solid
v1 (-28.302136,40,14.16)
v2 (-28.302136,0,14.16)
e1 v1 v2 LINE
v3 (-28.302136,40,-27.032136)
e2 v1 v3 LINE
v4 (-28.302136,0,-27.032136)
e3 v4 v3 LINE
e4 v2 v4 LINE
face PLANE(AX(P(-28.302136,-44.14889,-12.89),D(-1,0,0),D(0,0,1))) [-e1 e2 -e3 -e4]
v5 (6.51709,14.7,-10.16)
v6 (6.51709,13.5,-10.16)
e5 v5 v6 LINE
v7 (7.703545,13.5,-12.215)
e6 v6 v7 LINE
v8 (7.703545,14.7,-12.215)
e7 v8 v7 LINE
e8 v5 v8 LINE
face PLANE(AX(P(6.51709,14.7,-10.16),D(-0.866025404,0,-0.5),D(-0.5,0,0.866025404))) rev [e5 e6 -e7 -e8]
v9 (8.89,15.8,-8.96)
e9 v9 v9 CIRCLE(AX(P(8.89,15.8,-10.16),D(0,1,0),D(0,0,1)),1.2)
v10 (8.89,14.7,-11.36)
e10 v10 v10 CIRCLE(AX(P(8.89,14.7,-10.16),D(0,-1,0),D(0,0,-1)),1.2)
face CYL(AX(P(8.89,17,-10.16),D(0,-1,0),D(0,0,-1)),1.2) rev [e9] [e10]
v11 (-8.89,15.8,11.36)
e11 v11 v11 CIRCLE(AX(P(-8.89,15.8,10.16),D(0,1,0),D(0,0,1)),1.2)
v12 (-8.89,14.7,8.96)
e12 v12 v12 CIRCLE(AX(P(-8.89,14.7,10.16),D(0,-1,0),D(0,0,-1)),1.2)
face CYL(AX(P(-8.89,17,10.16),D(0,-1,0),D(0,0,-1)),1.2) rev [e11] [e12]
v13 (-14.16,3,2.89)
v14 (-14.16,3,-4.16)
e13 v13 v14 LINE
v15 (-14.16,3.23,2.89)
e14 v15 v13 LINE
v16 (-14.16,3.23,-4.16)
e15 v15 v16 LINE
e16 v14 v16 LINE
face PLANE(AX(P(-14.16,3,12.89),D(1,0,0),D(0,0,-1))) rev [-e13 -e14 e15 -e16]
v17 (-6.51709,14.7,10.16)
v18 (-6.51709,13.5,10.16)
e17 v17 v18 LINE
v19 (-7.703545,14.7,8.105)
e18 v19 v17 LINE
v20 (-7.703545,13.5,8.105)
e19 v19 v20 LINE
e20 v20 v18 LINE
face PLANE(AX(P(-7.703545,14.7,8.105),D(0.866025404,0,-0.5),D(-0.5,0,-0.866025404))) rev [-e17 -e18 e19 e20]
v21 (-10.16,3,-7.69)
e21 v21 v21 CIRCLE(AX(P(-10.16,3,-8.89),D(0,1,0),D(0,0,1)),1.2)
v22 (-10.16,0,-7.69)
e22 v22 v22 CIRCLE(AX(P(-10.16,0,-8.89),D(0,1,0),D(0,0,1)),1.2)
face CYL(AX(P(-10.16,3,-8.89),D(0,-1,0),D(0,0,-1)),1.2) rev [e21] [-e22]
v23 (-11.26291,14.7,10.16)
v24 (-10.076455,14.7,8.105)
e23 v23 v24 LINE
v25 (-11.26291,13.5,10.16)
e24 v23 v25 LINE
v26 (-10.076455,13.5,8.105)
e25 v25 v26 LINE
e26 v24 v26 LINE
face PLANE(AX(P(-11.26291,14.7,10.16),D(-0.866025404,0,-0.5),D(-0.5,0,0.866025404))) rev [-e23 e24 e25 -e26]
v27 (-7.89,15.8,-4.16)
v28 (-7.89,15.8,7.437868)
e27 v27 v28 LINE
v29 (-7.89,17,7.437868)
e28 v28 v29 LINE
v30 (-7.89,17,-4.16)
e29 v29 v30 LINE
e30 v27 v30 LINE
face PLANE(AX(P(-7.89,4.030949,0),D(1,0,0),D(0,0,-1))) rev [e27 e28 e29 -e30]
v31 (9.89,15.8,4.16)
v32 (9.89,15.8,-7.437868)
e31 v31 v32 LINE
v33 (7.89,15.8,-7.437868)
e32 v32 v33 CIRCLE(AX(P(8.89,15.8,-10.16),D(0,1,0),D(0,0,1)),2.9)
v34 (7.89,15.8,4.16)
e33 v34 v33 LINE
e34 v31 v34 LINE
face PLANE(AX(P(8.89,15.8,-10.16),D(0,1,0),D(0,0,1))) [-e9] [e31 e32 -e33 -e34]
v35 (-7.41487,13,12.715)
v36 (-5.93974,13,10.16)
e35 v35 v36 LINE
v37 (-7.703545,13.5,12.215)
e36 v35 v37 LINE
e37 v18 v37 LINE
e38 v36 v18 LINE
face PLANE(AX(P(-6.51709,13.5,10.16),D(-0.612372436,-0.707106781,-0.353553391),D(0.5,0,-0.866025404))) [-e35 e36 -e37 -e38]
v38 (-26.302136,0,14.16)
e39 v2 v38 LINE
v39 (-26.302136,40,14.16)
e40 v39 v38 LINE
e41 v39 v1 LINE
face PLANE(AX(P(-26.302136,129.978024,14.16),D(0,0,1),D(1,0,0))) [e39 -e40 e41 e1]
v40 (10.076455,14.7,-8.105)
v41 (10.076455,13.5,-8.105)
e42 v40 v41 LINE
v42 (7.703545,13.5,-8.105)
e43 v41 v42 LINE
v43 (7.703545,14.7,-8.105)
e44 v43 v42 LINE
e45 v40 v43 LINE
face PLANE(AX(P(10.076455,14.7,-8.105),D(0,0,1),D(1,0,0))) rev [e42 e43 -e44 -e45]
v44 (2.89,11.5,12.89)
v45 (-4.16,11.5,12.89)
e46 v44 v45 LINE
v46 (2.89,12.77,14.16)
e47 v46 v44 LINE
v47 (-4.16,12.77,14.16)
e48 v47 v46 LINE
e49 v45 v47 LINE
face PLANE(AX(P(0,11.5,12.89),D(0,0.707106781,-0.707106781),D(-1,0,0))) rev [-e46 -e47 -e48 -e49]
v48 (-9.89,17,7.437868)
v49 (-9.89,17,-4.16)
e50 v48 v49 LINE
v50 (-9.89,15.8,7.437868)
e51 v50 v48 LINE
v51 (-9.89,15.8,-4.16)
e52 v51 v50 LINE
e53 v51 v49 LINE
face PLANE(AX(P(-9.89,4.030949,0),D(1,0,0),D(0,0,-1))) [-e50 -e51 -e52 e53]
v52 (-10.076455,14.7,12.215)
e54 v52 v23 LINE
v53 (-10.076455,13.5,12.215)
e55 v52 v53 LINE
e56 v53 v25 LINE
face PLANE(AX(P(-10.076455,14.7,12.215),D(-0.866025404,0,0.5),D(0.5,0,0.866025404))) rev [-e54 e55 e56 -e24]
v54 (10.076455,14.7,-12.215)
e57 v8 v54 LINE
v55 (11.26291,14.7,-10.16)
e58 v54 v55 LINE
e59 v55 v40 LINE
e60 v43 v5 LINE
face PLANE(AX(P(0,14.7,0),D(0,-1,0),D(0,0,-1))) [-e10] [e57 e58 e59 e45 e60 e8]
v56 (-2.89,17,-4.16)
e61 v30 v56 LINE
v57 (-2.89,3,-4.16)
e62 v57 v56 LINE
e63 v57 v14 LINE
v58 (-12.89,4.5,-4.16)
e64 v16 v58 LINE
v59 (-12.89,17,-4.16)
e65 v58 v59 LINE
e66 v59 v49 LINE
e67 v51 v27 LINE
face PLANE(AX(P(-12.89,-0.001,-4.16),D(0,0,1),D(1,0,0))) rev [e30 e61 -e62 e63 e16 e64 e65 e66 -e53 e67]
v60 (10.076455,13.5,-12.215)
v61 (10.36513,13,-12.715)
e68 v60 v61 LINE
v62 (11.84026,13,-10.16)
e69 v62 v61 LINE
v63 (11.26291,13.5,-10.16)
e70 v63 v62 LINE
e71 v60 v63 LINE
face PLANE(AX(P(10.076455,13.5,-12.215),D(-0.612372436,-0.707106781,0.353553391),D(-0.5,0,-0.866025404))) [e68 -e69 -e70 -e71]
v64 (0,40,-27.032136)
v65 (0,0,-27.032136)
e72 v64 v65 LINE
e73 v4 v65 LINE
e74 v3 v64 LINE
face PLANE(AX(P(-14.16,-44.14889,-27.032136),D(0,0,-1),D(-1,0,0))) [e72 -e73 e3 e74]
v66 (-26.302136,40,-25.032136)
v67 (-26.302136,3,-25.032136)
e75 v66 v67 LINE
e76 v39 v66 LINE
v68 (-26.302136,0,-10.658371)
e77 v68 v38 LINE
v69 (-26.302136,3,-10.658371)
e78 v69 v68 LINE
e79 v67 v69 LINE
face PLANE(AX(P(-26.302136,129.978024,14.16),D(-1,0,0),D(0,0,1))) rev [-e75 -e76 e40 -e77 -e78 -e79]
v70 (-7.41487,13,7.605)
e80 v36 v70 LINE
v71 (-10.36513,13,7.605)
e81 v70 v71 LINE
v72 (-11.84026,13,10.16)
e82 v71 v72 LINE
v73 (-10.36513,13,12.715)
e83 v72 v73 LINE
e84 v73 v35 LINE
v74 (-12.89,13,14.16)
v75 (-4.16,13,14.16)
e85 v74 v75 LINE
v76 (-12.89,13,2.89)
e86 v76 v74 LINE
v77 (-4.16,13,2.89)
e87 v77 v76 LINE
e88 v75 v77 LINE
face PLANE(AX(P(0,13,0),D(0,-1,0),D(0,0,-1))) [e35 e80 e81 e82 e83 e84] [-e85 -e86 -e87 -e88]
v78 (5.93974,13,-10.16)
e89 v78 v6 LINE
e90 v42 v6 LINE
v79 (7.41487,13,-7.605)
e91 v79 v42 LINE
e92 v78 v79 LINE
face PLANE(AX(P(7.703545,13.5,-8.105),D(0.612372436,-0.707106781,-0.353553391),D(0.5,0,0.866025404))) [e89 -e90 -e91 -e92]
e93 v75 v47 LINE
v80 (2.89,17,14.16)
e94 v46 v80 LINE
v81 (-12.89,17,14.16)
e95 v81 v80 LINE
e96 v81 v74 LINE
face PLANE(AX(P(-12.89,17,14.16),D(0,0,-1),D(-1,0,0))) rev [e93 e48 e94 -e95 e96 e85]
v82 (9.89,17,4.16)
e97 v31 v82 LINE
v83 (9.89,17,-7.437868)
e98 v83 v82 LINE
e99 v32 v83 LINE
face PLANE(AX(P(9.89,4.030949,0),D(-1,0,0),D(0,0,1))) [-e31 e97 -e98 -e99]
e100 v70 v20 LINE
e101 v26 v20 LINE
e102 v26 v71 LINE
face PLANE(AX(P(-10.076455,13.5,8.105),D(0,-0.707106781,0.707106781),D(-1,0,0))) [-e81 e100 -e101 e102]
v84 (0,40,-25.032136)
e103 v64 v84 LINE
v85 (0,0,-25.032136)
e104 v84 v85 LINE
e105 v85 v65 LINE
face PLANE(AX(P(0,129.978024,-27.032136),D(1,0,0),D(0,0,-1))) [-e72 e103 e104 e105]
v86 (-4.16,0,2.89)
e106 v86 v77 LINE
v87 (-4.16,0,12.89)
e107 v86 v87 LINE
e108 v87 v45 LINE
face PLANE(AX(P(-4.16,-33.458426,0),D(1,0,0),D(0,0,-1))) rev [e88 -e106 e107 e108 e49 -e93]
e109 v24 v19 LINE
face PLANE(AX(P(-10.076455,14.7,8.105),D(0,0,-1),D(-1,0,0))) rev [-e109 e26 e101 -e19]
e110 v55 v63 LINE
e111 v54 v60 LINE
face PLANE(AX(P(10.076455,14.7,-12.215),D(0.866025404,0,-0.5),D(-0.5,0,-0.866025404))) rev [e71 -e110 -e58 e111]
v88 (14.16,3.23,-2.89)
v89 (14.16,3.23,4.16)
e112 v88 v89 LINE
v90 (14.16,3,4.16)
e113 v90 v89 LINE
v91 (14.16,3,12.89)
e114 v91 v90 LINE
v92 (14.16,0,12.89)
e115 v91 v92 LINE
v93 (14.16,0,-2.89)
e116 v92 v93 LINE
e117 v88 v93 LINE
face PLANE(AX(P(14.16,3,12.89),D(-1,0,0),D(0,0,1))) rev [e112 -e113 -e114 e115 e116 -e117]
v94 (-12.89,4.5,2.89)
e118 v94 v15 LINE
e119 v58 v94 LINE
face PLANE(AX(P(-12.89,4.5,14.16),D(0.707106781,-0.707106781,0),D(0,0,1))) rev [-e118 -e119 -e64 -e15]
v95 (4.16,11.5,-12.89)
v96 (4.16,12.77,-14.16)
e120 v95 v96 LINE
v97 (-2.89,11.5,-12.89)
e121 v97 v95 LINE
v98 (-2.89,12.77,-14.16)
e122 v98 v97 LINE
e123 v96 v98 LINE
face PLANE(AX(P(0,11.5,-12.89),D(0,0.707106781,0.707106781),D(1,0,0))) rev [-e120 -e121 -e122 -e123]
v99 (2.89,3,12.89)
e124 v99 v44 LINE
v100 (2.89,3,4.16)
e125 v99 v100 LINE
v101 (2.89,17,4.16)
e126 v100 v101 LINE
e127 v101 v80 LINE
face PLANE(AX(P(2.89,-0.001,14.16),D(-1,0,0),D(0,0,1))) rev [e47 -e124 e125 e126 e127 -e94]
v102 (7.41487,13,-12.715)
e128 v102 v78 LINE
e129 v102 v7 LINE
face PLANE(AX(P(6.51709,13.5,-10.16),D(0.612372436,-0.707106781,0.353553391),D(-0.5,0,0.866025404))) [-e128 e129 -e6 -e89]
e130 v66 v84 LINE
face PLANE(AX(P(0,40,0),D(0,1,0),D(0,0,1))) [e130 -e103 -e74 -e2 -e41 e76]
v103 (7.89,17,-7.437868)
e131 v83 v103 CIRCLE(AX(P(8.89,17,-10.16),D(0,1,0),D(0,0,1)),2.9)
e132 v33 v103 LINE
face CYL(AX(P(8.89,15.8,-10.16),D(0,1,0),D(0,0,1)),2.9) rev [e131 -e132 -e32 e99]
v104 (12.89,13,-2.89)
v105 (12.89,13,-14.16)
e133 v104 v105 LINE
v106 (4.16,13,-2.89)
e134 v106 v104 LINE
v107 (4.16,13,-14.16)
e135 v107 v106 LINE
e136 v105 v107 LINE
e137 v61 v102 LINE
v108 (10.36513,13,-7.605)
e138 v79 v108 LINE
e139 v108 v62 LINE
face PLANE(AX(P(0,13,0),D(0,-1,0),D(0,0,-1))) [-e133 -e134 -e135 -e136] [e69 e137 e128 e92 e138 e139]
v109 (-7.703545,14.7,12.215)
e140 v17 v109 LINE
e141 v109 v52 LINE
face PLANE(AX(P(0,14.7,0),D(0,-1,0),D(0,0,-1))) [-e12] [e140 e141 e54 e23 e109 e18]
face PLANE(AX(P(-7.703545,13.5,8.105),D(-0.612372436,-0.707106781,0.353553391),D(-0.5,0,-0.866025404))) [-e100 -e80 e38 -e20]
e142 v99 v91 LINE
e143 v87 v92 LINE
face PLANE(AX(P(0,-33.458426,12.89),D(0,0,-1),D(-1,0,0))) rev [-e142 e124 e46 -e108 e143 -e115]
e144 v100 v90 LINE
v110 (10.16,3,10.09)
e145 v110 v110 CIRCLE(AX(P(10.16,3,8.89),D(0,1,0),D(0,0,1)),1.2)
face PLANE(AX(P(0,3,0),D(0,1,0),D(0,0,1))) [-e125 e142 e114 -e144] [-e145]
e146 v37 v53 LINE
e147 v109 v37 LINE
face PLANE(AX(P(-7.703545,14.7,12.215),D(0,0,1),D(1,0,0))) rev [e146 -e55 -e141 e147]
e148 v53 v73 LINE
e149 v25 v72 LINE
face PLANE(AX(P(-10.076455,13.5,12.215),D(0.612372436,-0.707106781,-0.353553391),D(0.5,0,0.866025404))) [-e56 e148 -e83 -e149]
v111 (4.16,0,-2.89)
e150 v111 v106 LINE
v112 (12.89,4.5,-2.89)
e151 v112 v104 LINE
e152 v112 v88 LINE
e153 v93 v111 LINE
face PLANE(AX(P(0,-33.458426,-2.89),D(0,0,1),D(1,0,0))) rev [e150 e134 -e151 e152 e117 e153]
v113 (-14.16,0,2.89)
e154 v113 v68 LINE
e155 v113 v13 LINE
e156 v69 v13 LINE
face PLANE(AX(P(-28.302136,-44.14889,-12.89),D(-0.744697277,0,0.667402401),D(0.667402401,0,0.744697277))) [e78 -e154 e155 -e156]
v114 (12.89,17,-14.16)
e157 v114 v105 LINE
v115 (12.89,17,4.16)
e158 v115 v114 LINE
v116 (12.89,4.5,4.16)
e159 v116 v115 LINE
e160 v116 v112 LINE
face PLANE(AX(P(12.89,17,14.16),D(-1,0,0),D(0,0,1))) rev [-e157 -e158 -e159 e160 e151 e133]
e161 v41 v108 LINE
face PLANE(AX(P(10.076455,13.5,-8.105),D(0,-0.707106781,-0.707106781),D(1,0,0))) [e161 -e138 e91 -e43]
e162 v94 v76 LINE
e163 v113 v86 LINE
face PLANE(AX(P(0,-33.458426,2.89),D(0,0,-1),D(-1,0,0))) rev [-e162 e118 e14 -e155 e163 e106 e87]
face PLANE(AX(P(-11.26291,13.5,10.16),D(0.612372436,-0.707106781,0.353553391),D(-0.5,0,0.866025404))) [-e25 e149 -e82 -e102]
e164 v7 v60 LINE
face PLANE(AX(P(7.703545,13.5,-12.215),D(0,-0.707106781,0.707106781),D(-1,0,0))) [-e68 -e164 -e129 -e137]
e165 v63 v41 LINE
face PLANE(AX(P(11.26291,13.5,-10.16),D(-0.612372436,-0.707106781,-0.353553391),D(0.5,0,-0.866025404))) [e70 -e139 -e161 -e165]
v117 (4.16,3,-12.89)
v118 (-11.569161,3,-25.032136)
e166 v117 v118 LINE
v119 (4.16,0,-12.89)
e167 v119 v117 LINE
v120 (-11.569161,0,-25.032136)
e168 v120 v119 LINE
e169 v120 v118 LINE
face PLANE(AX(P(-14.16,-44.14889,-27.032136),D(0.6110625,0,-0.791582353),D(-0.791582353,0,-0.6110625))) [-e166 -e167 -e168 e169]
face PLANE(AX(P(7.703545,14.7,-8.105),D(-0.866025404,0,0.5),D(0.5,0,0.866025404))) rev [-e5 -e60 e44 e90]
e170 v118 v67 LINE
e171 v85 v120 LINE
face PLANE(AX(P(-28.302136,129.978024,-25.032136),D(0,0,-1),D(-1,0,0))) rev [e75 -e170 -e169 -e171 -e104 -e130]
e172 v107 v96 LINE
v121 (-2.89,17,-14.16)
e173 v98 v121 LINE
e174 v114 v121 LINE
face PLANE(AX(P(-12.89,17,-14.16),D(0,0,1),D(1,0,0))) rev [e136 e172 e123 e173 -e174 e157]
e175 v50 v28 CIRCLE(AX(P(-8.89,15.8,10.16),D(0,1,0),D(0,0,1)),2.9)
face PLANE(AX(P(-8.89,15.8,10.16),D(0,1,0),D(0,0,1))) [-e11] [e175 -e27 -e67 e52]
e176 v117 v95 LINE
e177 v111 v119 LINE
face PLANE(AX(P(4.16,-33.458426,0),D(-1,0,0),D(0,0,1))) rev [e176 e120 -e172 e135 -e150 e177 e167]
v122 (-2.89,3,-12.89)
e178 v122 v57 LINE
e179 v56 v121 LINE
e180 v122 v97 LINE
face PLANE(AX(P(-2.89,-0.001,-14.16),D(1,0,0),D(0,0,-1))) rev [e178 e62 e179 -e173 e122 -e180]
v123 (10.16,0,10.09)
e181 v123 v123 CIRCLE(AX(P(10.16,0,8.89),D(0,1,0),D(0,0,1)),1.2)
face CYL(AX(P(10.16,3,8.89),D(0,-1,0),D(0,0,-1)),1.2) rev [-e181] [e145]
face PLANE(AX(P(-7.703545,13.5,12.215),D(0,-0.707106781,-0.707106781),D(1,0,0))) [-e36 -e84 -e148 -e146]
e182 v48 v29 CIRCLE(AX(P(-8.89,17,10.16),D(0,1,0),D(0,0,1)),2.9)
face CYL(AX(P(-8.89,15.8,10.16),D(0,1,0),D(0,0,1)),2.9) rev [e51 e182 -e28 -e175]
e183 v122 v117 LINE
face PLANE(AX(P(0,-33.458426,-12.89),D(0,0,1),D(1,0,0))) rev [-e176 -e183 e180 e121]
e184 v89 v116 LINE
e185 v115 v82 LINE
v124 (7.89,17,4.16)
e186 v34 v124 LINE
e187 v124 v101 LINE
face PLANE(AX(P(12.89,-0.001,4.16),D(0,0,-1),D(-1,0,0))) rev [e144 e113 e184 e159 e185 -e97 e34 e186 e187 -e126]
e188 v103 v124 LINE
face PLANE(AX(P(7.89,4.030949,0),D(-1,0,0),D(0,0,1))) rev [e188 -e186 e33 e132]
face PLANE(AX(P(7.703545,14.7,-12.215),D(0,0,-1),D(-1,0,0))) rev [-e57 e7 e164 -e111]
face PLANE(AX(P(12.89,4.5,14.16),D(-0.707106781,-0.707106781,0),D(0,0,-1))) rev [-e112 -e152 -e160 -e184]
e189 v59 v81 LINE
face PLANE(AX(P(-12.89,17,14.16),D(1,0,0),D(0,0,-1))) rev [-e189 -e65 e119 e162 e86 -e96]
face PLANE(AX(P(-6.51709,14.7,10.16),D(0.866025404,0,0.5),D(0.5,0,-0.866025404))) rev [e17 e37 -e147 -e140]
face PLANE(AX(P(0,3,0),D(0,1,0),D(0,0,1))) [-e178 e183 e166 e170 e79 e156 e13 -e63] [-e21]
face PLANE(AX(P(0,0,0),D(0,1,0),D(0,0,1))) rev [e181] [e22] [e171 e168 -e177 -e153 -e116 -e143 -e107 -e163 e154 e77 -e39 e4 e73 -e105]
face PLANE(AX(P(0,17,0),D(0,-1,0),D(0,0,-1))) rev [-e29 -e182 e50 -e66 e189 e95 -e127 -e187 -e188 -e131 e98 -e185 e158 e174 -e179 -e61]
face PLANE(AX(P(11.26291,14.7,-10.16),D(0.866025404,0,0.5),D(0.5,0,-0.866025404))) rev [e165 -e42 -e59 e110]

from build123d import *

# Parameters (mm, degrees)
SKETCH1_W           = 28.32
SKETCH1_H           = 25.78
SKETCH1_R           = 1.2
BOSS_EXTRUDE1_DEPTH = 3
SKETCH4_W           = 25.78
SKETCH4_H           = 28.32
SKETCH4_R           = 1.2
BOSS_EXTRUDE2_DEPTH = 4
SKETCH5_W           = 10
SKETCH5_H           = 10
CUT_EXTRUDE2_DEPTH  = 4
SKETCH8_W           = 10
SKETCH8_H           = 10
CUT_EXTRUDE3_DEPTH  = 3
BOSS_EXTRUDE3_DEPTH = 10
SKETCH3_R           = 2.9
CUT_EXTRUDE4_DEPTH  = 1.2
CHAMFER1_SIZE       = 1.5
BOSS_EXTRUDE4_DEPTH = 3
EXTRUDE_THIN1_START = -3
EXTRUDE_THIN1_DEPTH = 40
CUT_EXTRUDE5_DEPTH  = 1.7
CHAMFER2_SIZE       = 0.5
CUT_EXTRUDE6_DEPTH  = 1.2


with BuildPart() as part:
    # Sketch1 → Boss-Extrude1 (new body)
    with BuildSketch(Plane(origin=(0, 0, 0), x_dir=(1, 0, 0), z_dir=(0, 1, 0))):
        Rectangle(SKETCH1_W, SKETCH1_H)
        with Locations(Location((-10.16, 8.89, 0), (0, 0, 270))):
            Circle(SKETCH1_R, mode=Mode.SUBTRACT)
        with Locations(Location((10.16, 8.89, 0), (0, 0, 270))):
            Circle(SKETCH1_R, mode=Mode.SUBTRACT)
        with Locations(Location((10.16, -8.89, 0), (0, 0, 270))):
            Circle(SKETCH1_R, mode=Mode.SUBTRACT)
        with Locations(Location((-10.16, -8.89, 0), (0, 0, 270))):
            Circle(SKETCH1_R, mode=Mode.SUBTRACT)
    extrude(amount=BOSS_EXTRUDE1_DEPTH)

    # Sketch8 → Cut-Extrude3 (cut)
    with BuildSketch(Plane.XZ):
        with Locations((-9.16, 7.89)):
            Rectangle(SKETCH8_W, SKETCH8_H)
        with Locations((9.16, -7.89)):
            Rectangle(SKETCH8_W, SKETCH8_H)
    extrude(amount=-CUT_EXTRUDE3_DEPTH, mode=Mode.SUBTRACT)



with BuildPart() as body_2:
    # Sketch4 → Boss-Extrude2 (new body)
    with BuildSketch(Plane(origin=(0, 13, 0), x_dir=(1, 0, 0), z_dir=(0, 1, 0))):
        Rectangle(SKETCH4_W, SKETCH4_H)
        with Locations(Location((-8.89, 10.16, 0), (0, 0, 270))):
            Circle(SKETCH4_R, mode=Mode.SUBTRACT)
        with Locations(Location((8.89, 10.16, 0), (0, 0, 270))):
            Circle(SKETCH4_R, mode=Mode.SUBTRACT)
        with Locations(Location((-8.89, -10.16, 0), (0, 0, 270))):
            Circle(SKETCH4_R, mode=Mode.SUBTRACT)
        with Locations(Location((8.89, -10.16, 0), (0, 0, 270))):
            Circle(SKETCH4_R, mode=Mode.SUBTRACT)
    extrude(amount=BOSS_EXTRUDE2_DEPTH)

    # Sketch5 → Cut-Extrude2 (cut)
    with BuildSketch(Plane(origin=(0, 17, 0), x_dir=(1, 0, 0), z_dir=(0, 1, 0))):
        with Locations((-7.89, 9.16)):
            Rectangle(SKETCH5_W, SKETCH5_H)
        with Locations((7.89, -9.16)):
            Rectangle(SKETCH5_W, SKETCH5_H)
    extrude(amount=-CUT_EXTRUDE2_DEPTH, mode=Mode.SUBTRACT)


with BuildPart() as part_1:
    add(part.part)

    add(body_2.part)  # Boss-Extrude3 merges body 2
    # Sketch9 → Boss-Extrude3 (add)
    with BuildSketch(Plane.XZ.offset(-13)):
        Polygon((2.89, 4.16), (2.89, 12.89), (-4.16, 12.89), (-4.16, 2.89), (-12.89, 2.89), (-12.89, -4.16), (-2.89, -4.16), (-2.89, -12.89), (4.16, -12.89), (4.16, -2.89), (12.89, -2.89), (12.89, 4.16), align=None)
    extrude(amount=BOSS_EXTRUDE3_DEPTH)

    # Sketch3 → Cut-Extrude4 (cut)
    with BuildSketch(Plane(origin=(0, 17, 0), x_dir=(1, 0, 0), z_dir=(0, 1, 0))):
        with Locations(Location((8.89, 10.16, 0), (0, 0, 270))):
            Circle(SKETCH3_R)
        with Locations(Location((-8.89, -10.16, 0), (0, 0, 270))):
            Circle(SKETCH3_R)
    extrude(amount=-CUT_EXTRUDE4_DEPTH, mode=Mode.SUBTRACT)

    # Chamfer1
    # the kernel refuses this chamfer: 1.5 mm, written as the material it adds along each edge
    with BuildSketch(Plane(origin=(-2.89, 13, -12.89), x_dir=(0, -0.9996219169112968, 0.027495876610585616), z_dir=(1, 0, 0))) as chamfer1_piece_1_section:
        Polygon((CHAMFER1_SIZE * 0.999621916911, CHAMFER1_SIZE * 0.0274958766106), (-CHAMFER1_SIZE * 0.0274958766106, CHAMFER1_SIZE * 0.999621916911), (0, 0), align=None)
    chamfer1_piece_1 = extrude(amount=7.05, mode=Mode.PRIVATE)
    chamfer1_piece_1 = split(chamfer1_piece_1, bisect_by=Plane(origin=(0.635, 12.489006397, -14.16), z_dir=(0, 0, 1)), keep=Keep.TOP, mode=Mode.PRIVATE)
    add(chamfer1_piece_1)
    with BuildSketch(Plane(origin=(2.89, 13, 12.89), x_dir=(0, -0.9996219169112965, -0.02749587661058676), z_dir=(-1, 0, 0))) as chamfer1_piece_2_section:
        Polygon((CHAMFER1_SIZE * 0.999621916911, CHAMFER1_SIZE * 0.0274958766106), (-CHAMFER1_SIZE * 0.0274958766106, CHAMFER1_SIZE * 0.999621916911), (0, 0), align=None)
    chamfer1_piece_2 = extrude(amount=7.05, mode=Mode.PRIVATE)
    chamfer1_piece_2 = split(chamfer1_piece_2, bisect_by=Plane(origin=(-0.635, 12.489006397, 14.16), z_dir=(0, 0, -1)), keep=Keep.TOP, mode=Mode.PRIVATE)
    add(chamfer1_piece_2)
    with BuildSketch(Plane(origin=(12.89, 3, -2.89), x_dir=(0.9996219169112965, -0.027495876610587625, 0), z_dir=(0, 0, 1))) as chamfer1_piece_3_section:
        Polygon((CHAMFER1_SIZE * 0.999621916911, CHAMFER1_SIZE * 0.0274958766106), (-CHAMFER1_SIZE * 0.0274958766106, CHAMFER1_SIZE * 0.999621916911), (0, 0), align=None)
    chamfer1_piece_3 = extrude(amount=7.05, mode=Mode.PRIVATE)
    chamfer1_piece_3 = split(chamfer1_piece_3, bisect_by=Plane(origin=(14.16, 3.510993603, 0.635), z_dir=(-1, 0, 0)), keep=Keep.TOP, mode=Mode.PRIVATE)
    add(chamfer1_piece_3)
    with BuildSketch(Plane(origin=(-12.89, 3, 2.89), x_dir=(-0.9996219169112965, -0.027495876610587625, 0), z_dir=(0, 0, -1))) as chamfer1_piece_4_section:
        Polygon((CHAMFER1_SIZE * 0.999621916911, CHAMFER1_SIZE * 0.0274958766106), (-CHAMFER1_SIZE * 0.0274958766106, CHAMFER1_SIZE * 0.999621916911), (0, 0), align=None)
    chamfer1_piece_4 = extrude(amount=7.05, mode=Mode.PRIVATE)
    chamfer1_piece_4 = split(chamfer1_piece_4, bisect_by=Plane(origin=(-14.16, 3.510993603, -0.635), z_dir=(1, 0, 0)), keep=Keep.TOP, mode=Mode.PRIVATE)
    add(chamfer1_piece_4)

    # Sketch10 → Boss-Extrude4 (add)
    with BuildSketch(Plane(origin=(0, 3, 0), x_dir=(1, 0, 0), z_dir=(0, 1, 0))):
        Polygon((-28.302135624, 12.89), (-14.16, -2.89), (-14.16, 12.89), (4.16, 12.89), (-14.16, 27.032135624), (-28.302135624, 27.032135624), align=None)
    extrude(amount=-BOSS_EXTRUDE4_DEPTH)

    # Sketch11 → Extrude-Thin1 (add)
    with BuildSketch(Plane(origin=(0, 3, 0), x_dir=(1, 0, 0), z_dir=(0, 1, 0)).offset(EXTRUDE_THIN1_START)):
        Polygon((-28.302135624, -14.16), (-28.302135624, 27.032135624), (0, 27.032135624), (0, 25.032135624), (-26.302135624, 25.032135624), (-26.302135624, -14.16), align=None)
    extrude(amount=EXTRUDE_THIN1_DEPTH)

    # Sketch12 → Cut-Extrude5 (cut)
    with BuildSketch(Plane.XZ.offset(-13)):
        Polygon((-10.076454803, 12.215), (-11.262909606, 10.16), (-10.076454803, 8.105), (-7.703545197, 8.105), (-6.517090394, 10.16), (-7.703545197, 12.215), align=None)
        Polygon((10.076454803, -12.215), (11.262909606, -10.16), (10.076454803, -8.105), (7.703545197, -8.105), (6.517090394, -10.16), (7.703545197, -12.215), align=None)
    extrude(amount=-CUT_EXTRUDE5_DEPTH, mode=Mode.SUBTRACT)

    # Chamfer2
    chamfer2_edges = [part_1.edges().sort_by_distance(p)[0] for p in [
        (-8.89, 13, 12.215),
        (-10.669682205, 13, 11.1875),
        (-10.669682205, 13, 9.1325),
        (-8.89, 13, 8.105),
        (-7.110317795, 13, 9.1325),
        (-7.110317795, 13, 11.1875),
        (8.89, 13, -12.215),
        (10.669682205, 13, -11.1875),
        (10.669682205, 13, -9.1325),
        (8.89, 13, -8.105),
        (7.110317795, 13, -9.1325),
        (7.110317795, 13, -11.1875),
    ]]
    chamfer(chamfer2_edges, length=CHAMFER2_SIZE)

    # Sketch13 → Cut-Extrude6 (cut)
    with BuildSketch(Plane(origin=(0, 17, 0), x_dir=(1, 0, 0), z_dir=(0, 1, 0))):
        with BuildLine():
            Line((-9.89, 4.16), (-9.89, -7.437868482))
            ThreePointArc((-9.89, -7.437868482), (-8.89, -7.26), (-7.89, -7.437868482))
            Line((-7.89, -7.437868482), (-7.89, 4.16))
            Line((-7.89, 4.16), (-9.89, 4.16))
        make_face()
        with BuildLine():
            ThreePointArc((9.89, 7.437868482), (8.89, 7.26), (7.89, 7.437868482))
            Line((7.89, 7.437868482), (7.89, -4.16))
            Line((7.89, -4.16), (9.89, -4.16))
            Line((9.89, -4.16), (9.89, 7.437868482))
        make_face()
    extrude(amount=-CUT_EXTRUDE6_DEPTH, mode=Mode.SUBTRACT)


solid = part_1.part
